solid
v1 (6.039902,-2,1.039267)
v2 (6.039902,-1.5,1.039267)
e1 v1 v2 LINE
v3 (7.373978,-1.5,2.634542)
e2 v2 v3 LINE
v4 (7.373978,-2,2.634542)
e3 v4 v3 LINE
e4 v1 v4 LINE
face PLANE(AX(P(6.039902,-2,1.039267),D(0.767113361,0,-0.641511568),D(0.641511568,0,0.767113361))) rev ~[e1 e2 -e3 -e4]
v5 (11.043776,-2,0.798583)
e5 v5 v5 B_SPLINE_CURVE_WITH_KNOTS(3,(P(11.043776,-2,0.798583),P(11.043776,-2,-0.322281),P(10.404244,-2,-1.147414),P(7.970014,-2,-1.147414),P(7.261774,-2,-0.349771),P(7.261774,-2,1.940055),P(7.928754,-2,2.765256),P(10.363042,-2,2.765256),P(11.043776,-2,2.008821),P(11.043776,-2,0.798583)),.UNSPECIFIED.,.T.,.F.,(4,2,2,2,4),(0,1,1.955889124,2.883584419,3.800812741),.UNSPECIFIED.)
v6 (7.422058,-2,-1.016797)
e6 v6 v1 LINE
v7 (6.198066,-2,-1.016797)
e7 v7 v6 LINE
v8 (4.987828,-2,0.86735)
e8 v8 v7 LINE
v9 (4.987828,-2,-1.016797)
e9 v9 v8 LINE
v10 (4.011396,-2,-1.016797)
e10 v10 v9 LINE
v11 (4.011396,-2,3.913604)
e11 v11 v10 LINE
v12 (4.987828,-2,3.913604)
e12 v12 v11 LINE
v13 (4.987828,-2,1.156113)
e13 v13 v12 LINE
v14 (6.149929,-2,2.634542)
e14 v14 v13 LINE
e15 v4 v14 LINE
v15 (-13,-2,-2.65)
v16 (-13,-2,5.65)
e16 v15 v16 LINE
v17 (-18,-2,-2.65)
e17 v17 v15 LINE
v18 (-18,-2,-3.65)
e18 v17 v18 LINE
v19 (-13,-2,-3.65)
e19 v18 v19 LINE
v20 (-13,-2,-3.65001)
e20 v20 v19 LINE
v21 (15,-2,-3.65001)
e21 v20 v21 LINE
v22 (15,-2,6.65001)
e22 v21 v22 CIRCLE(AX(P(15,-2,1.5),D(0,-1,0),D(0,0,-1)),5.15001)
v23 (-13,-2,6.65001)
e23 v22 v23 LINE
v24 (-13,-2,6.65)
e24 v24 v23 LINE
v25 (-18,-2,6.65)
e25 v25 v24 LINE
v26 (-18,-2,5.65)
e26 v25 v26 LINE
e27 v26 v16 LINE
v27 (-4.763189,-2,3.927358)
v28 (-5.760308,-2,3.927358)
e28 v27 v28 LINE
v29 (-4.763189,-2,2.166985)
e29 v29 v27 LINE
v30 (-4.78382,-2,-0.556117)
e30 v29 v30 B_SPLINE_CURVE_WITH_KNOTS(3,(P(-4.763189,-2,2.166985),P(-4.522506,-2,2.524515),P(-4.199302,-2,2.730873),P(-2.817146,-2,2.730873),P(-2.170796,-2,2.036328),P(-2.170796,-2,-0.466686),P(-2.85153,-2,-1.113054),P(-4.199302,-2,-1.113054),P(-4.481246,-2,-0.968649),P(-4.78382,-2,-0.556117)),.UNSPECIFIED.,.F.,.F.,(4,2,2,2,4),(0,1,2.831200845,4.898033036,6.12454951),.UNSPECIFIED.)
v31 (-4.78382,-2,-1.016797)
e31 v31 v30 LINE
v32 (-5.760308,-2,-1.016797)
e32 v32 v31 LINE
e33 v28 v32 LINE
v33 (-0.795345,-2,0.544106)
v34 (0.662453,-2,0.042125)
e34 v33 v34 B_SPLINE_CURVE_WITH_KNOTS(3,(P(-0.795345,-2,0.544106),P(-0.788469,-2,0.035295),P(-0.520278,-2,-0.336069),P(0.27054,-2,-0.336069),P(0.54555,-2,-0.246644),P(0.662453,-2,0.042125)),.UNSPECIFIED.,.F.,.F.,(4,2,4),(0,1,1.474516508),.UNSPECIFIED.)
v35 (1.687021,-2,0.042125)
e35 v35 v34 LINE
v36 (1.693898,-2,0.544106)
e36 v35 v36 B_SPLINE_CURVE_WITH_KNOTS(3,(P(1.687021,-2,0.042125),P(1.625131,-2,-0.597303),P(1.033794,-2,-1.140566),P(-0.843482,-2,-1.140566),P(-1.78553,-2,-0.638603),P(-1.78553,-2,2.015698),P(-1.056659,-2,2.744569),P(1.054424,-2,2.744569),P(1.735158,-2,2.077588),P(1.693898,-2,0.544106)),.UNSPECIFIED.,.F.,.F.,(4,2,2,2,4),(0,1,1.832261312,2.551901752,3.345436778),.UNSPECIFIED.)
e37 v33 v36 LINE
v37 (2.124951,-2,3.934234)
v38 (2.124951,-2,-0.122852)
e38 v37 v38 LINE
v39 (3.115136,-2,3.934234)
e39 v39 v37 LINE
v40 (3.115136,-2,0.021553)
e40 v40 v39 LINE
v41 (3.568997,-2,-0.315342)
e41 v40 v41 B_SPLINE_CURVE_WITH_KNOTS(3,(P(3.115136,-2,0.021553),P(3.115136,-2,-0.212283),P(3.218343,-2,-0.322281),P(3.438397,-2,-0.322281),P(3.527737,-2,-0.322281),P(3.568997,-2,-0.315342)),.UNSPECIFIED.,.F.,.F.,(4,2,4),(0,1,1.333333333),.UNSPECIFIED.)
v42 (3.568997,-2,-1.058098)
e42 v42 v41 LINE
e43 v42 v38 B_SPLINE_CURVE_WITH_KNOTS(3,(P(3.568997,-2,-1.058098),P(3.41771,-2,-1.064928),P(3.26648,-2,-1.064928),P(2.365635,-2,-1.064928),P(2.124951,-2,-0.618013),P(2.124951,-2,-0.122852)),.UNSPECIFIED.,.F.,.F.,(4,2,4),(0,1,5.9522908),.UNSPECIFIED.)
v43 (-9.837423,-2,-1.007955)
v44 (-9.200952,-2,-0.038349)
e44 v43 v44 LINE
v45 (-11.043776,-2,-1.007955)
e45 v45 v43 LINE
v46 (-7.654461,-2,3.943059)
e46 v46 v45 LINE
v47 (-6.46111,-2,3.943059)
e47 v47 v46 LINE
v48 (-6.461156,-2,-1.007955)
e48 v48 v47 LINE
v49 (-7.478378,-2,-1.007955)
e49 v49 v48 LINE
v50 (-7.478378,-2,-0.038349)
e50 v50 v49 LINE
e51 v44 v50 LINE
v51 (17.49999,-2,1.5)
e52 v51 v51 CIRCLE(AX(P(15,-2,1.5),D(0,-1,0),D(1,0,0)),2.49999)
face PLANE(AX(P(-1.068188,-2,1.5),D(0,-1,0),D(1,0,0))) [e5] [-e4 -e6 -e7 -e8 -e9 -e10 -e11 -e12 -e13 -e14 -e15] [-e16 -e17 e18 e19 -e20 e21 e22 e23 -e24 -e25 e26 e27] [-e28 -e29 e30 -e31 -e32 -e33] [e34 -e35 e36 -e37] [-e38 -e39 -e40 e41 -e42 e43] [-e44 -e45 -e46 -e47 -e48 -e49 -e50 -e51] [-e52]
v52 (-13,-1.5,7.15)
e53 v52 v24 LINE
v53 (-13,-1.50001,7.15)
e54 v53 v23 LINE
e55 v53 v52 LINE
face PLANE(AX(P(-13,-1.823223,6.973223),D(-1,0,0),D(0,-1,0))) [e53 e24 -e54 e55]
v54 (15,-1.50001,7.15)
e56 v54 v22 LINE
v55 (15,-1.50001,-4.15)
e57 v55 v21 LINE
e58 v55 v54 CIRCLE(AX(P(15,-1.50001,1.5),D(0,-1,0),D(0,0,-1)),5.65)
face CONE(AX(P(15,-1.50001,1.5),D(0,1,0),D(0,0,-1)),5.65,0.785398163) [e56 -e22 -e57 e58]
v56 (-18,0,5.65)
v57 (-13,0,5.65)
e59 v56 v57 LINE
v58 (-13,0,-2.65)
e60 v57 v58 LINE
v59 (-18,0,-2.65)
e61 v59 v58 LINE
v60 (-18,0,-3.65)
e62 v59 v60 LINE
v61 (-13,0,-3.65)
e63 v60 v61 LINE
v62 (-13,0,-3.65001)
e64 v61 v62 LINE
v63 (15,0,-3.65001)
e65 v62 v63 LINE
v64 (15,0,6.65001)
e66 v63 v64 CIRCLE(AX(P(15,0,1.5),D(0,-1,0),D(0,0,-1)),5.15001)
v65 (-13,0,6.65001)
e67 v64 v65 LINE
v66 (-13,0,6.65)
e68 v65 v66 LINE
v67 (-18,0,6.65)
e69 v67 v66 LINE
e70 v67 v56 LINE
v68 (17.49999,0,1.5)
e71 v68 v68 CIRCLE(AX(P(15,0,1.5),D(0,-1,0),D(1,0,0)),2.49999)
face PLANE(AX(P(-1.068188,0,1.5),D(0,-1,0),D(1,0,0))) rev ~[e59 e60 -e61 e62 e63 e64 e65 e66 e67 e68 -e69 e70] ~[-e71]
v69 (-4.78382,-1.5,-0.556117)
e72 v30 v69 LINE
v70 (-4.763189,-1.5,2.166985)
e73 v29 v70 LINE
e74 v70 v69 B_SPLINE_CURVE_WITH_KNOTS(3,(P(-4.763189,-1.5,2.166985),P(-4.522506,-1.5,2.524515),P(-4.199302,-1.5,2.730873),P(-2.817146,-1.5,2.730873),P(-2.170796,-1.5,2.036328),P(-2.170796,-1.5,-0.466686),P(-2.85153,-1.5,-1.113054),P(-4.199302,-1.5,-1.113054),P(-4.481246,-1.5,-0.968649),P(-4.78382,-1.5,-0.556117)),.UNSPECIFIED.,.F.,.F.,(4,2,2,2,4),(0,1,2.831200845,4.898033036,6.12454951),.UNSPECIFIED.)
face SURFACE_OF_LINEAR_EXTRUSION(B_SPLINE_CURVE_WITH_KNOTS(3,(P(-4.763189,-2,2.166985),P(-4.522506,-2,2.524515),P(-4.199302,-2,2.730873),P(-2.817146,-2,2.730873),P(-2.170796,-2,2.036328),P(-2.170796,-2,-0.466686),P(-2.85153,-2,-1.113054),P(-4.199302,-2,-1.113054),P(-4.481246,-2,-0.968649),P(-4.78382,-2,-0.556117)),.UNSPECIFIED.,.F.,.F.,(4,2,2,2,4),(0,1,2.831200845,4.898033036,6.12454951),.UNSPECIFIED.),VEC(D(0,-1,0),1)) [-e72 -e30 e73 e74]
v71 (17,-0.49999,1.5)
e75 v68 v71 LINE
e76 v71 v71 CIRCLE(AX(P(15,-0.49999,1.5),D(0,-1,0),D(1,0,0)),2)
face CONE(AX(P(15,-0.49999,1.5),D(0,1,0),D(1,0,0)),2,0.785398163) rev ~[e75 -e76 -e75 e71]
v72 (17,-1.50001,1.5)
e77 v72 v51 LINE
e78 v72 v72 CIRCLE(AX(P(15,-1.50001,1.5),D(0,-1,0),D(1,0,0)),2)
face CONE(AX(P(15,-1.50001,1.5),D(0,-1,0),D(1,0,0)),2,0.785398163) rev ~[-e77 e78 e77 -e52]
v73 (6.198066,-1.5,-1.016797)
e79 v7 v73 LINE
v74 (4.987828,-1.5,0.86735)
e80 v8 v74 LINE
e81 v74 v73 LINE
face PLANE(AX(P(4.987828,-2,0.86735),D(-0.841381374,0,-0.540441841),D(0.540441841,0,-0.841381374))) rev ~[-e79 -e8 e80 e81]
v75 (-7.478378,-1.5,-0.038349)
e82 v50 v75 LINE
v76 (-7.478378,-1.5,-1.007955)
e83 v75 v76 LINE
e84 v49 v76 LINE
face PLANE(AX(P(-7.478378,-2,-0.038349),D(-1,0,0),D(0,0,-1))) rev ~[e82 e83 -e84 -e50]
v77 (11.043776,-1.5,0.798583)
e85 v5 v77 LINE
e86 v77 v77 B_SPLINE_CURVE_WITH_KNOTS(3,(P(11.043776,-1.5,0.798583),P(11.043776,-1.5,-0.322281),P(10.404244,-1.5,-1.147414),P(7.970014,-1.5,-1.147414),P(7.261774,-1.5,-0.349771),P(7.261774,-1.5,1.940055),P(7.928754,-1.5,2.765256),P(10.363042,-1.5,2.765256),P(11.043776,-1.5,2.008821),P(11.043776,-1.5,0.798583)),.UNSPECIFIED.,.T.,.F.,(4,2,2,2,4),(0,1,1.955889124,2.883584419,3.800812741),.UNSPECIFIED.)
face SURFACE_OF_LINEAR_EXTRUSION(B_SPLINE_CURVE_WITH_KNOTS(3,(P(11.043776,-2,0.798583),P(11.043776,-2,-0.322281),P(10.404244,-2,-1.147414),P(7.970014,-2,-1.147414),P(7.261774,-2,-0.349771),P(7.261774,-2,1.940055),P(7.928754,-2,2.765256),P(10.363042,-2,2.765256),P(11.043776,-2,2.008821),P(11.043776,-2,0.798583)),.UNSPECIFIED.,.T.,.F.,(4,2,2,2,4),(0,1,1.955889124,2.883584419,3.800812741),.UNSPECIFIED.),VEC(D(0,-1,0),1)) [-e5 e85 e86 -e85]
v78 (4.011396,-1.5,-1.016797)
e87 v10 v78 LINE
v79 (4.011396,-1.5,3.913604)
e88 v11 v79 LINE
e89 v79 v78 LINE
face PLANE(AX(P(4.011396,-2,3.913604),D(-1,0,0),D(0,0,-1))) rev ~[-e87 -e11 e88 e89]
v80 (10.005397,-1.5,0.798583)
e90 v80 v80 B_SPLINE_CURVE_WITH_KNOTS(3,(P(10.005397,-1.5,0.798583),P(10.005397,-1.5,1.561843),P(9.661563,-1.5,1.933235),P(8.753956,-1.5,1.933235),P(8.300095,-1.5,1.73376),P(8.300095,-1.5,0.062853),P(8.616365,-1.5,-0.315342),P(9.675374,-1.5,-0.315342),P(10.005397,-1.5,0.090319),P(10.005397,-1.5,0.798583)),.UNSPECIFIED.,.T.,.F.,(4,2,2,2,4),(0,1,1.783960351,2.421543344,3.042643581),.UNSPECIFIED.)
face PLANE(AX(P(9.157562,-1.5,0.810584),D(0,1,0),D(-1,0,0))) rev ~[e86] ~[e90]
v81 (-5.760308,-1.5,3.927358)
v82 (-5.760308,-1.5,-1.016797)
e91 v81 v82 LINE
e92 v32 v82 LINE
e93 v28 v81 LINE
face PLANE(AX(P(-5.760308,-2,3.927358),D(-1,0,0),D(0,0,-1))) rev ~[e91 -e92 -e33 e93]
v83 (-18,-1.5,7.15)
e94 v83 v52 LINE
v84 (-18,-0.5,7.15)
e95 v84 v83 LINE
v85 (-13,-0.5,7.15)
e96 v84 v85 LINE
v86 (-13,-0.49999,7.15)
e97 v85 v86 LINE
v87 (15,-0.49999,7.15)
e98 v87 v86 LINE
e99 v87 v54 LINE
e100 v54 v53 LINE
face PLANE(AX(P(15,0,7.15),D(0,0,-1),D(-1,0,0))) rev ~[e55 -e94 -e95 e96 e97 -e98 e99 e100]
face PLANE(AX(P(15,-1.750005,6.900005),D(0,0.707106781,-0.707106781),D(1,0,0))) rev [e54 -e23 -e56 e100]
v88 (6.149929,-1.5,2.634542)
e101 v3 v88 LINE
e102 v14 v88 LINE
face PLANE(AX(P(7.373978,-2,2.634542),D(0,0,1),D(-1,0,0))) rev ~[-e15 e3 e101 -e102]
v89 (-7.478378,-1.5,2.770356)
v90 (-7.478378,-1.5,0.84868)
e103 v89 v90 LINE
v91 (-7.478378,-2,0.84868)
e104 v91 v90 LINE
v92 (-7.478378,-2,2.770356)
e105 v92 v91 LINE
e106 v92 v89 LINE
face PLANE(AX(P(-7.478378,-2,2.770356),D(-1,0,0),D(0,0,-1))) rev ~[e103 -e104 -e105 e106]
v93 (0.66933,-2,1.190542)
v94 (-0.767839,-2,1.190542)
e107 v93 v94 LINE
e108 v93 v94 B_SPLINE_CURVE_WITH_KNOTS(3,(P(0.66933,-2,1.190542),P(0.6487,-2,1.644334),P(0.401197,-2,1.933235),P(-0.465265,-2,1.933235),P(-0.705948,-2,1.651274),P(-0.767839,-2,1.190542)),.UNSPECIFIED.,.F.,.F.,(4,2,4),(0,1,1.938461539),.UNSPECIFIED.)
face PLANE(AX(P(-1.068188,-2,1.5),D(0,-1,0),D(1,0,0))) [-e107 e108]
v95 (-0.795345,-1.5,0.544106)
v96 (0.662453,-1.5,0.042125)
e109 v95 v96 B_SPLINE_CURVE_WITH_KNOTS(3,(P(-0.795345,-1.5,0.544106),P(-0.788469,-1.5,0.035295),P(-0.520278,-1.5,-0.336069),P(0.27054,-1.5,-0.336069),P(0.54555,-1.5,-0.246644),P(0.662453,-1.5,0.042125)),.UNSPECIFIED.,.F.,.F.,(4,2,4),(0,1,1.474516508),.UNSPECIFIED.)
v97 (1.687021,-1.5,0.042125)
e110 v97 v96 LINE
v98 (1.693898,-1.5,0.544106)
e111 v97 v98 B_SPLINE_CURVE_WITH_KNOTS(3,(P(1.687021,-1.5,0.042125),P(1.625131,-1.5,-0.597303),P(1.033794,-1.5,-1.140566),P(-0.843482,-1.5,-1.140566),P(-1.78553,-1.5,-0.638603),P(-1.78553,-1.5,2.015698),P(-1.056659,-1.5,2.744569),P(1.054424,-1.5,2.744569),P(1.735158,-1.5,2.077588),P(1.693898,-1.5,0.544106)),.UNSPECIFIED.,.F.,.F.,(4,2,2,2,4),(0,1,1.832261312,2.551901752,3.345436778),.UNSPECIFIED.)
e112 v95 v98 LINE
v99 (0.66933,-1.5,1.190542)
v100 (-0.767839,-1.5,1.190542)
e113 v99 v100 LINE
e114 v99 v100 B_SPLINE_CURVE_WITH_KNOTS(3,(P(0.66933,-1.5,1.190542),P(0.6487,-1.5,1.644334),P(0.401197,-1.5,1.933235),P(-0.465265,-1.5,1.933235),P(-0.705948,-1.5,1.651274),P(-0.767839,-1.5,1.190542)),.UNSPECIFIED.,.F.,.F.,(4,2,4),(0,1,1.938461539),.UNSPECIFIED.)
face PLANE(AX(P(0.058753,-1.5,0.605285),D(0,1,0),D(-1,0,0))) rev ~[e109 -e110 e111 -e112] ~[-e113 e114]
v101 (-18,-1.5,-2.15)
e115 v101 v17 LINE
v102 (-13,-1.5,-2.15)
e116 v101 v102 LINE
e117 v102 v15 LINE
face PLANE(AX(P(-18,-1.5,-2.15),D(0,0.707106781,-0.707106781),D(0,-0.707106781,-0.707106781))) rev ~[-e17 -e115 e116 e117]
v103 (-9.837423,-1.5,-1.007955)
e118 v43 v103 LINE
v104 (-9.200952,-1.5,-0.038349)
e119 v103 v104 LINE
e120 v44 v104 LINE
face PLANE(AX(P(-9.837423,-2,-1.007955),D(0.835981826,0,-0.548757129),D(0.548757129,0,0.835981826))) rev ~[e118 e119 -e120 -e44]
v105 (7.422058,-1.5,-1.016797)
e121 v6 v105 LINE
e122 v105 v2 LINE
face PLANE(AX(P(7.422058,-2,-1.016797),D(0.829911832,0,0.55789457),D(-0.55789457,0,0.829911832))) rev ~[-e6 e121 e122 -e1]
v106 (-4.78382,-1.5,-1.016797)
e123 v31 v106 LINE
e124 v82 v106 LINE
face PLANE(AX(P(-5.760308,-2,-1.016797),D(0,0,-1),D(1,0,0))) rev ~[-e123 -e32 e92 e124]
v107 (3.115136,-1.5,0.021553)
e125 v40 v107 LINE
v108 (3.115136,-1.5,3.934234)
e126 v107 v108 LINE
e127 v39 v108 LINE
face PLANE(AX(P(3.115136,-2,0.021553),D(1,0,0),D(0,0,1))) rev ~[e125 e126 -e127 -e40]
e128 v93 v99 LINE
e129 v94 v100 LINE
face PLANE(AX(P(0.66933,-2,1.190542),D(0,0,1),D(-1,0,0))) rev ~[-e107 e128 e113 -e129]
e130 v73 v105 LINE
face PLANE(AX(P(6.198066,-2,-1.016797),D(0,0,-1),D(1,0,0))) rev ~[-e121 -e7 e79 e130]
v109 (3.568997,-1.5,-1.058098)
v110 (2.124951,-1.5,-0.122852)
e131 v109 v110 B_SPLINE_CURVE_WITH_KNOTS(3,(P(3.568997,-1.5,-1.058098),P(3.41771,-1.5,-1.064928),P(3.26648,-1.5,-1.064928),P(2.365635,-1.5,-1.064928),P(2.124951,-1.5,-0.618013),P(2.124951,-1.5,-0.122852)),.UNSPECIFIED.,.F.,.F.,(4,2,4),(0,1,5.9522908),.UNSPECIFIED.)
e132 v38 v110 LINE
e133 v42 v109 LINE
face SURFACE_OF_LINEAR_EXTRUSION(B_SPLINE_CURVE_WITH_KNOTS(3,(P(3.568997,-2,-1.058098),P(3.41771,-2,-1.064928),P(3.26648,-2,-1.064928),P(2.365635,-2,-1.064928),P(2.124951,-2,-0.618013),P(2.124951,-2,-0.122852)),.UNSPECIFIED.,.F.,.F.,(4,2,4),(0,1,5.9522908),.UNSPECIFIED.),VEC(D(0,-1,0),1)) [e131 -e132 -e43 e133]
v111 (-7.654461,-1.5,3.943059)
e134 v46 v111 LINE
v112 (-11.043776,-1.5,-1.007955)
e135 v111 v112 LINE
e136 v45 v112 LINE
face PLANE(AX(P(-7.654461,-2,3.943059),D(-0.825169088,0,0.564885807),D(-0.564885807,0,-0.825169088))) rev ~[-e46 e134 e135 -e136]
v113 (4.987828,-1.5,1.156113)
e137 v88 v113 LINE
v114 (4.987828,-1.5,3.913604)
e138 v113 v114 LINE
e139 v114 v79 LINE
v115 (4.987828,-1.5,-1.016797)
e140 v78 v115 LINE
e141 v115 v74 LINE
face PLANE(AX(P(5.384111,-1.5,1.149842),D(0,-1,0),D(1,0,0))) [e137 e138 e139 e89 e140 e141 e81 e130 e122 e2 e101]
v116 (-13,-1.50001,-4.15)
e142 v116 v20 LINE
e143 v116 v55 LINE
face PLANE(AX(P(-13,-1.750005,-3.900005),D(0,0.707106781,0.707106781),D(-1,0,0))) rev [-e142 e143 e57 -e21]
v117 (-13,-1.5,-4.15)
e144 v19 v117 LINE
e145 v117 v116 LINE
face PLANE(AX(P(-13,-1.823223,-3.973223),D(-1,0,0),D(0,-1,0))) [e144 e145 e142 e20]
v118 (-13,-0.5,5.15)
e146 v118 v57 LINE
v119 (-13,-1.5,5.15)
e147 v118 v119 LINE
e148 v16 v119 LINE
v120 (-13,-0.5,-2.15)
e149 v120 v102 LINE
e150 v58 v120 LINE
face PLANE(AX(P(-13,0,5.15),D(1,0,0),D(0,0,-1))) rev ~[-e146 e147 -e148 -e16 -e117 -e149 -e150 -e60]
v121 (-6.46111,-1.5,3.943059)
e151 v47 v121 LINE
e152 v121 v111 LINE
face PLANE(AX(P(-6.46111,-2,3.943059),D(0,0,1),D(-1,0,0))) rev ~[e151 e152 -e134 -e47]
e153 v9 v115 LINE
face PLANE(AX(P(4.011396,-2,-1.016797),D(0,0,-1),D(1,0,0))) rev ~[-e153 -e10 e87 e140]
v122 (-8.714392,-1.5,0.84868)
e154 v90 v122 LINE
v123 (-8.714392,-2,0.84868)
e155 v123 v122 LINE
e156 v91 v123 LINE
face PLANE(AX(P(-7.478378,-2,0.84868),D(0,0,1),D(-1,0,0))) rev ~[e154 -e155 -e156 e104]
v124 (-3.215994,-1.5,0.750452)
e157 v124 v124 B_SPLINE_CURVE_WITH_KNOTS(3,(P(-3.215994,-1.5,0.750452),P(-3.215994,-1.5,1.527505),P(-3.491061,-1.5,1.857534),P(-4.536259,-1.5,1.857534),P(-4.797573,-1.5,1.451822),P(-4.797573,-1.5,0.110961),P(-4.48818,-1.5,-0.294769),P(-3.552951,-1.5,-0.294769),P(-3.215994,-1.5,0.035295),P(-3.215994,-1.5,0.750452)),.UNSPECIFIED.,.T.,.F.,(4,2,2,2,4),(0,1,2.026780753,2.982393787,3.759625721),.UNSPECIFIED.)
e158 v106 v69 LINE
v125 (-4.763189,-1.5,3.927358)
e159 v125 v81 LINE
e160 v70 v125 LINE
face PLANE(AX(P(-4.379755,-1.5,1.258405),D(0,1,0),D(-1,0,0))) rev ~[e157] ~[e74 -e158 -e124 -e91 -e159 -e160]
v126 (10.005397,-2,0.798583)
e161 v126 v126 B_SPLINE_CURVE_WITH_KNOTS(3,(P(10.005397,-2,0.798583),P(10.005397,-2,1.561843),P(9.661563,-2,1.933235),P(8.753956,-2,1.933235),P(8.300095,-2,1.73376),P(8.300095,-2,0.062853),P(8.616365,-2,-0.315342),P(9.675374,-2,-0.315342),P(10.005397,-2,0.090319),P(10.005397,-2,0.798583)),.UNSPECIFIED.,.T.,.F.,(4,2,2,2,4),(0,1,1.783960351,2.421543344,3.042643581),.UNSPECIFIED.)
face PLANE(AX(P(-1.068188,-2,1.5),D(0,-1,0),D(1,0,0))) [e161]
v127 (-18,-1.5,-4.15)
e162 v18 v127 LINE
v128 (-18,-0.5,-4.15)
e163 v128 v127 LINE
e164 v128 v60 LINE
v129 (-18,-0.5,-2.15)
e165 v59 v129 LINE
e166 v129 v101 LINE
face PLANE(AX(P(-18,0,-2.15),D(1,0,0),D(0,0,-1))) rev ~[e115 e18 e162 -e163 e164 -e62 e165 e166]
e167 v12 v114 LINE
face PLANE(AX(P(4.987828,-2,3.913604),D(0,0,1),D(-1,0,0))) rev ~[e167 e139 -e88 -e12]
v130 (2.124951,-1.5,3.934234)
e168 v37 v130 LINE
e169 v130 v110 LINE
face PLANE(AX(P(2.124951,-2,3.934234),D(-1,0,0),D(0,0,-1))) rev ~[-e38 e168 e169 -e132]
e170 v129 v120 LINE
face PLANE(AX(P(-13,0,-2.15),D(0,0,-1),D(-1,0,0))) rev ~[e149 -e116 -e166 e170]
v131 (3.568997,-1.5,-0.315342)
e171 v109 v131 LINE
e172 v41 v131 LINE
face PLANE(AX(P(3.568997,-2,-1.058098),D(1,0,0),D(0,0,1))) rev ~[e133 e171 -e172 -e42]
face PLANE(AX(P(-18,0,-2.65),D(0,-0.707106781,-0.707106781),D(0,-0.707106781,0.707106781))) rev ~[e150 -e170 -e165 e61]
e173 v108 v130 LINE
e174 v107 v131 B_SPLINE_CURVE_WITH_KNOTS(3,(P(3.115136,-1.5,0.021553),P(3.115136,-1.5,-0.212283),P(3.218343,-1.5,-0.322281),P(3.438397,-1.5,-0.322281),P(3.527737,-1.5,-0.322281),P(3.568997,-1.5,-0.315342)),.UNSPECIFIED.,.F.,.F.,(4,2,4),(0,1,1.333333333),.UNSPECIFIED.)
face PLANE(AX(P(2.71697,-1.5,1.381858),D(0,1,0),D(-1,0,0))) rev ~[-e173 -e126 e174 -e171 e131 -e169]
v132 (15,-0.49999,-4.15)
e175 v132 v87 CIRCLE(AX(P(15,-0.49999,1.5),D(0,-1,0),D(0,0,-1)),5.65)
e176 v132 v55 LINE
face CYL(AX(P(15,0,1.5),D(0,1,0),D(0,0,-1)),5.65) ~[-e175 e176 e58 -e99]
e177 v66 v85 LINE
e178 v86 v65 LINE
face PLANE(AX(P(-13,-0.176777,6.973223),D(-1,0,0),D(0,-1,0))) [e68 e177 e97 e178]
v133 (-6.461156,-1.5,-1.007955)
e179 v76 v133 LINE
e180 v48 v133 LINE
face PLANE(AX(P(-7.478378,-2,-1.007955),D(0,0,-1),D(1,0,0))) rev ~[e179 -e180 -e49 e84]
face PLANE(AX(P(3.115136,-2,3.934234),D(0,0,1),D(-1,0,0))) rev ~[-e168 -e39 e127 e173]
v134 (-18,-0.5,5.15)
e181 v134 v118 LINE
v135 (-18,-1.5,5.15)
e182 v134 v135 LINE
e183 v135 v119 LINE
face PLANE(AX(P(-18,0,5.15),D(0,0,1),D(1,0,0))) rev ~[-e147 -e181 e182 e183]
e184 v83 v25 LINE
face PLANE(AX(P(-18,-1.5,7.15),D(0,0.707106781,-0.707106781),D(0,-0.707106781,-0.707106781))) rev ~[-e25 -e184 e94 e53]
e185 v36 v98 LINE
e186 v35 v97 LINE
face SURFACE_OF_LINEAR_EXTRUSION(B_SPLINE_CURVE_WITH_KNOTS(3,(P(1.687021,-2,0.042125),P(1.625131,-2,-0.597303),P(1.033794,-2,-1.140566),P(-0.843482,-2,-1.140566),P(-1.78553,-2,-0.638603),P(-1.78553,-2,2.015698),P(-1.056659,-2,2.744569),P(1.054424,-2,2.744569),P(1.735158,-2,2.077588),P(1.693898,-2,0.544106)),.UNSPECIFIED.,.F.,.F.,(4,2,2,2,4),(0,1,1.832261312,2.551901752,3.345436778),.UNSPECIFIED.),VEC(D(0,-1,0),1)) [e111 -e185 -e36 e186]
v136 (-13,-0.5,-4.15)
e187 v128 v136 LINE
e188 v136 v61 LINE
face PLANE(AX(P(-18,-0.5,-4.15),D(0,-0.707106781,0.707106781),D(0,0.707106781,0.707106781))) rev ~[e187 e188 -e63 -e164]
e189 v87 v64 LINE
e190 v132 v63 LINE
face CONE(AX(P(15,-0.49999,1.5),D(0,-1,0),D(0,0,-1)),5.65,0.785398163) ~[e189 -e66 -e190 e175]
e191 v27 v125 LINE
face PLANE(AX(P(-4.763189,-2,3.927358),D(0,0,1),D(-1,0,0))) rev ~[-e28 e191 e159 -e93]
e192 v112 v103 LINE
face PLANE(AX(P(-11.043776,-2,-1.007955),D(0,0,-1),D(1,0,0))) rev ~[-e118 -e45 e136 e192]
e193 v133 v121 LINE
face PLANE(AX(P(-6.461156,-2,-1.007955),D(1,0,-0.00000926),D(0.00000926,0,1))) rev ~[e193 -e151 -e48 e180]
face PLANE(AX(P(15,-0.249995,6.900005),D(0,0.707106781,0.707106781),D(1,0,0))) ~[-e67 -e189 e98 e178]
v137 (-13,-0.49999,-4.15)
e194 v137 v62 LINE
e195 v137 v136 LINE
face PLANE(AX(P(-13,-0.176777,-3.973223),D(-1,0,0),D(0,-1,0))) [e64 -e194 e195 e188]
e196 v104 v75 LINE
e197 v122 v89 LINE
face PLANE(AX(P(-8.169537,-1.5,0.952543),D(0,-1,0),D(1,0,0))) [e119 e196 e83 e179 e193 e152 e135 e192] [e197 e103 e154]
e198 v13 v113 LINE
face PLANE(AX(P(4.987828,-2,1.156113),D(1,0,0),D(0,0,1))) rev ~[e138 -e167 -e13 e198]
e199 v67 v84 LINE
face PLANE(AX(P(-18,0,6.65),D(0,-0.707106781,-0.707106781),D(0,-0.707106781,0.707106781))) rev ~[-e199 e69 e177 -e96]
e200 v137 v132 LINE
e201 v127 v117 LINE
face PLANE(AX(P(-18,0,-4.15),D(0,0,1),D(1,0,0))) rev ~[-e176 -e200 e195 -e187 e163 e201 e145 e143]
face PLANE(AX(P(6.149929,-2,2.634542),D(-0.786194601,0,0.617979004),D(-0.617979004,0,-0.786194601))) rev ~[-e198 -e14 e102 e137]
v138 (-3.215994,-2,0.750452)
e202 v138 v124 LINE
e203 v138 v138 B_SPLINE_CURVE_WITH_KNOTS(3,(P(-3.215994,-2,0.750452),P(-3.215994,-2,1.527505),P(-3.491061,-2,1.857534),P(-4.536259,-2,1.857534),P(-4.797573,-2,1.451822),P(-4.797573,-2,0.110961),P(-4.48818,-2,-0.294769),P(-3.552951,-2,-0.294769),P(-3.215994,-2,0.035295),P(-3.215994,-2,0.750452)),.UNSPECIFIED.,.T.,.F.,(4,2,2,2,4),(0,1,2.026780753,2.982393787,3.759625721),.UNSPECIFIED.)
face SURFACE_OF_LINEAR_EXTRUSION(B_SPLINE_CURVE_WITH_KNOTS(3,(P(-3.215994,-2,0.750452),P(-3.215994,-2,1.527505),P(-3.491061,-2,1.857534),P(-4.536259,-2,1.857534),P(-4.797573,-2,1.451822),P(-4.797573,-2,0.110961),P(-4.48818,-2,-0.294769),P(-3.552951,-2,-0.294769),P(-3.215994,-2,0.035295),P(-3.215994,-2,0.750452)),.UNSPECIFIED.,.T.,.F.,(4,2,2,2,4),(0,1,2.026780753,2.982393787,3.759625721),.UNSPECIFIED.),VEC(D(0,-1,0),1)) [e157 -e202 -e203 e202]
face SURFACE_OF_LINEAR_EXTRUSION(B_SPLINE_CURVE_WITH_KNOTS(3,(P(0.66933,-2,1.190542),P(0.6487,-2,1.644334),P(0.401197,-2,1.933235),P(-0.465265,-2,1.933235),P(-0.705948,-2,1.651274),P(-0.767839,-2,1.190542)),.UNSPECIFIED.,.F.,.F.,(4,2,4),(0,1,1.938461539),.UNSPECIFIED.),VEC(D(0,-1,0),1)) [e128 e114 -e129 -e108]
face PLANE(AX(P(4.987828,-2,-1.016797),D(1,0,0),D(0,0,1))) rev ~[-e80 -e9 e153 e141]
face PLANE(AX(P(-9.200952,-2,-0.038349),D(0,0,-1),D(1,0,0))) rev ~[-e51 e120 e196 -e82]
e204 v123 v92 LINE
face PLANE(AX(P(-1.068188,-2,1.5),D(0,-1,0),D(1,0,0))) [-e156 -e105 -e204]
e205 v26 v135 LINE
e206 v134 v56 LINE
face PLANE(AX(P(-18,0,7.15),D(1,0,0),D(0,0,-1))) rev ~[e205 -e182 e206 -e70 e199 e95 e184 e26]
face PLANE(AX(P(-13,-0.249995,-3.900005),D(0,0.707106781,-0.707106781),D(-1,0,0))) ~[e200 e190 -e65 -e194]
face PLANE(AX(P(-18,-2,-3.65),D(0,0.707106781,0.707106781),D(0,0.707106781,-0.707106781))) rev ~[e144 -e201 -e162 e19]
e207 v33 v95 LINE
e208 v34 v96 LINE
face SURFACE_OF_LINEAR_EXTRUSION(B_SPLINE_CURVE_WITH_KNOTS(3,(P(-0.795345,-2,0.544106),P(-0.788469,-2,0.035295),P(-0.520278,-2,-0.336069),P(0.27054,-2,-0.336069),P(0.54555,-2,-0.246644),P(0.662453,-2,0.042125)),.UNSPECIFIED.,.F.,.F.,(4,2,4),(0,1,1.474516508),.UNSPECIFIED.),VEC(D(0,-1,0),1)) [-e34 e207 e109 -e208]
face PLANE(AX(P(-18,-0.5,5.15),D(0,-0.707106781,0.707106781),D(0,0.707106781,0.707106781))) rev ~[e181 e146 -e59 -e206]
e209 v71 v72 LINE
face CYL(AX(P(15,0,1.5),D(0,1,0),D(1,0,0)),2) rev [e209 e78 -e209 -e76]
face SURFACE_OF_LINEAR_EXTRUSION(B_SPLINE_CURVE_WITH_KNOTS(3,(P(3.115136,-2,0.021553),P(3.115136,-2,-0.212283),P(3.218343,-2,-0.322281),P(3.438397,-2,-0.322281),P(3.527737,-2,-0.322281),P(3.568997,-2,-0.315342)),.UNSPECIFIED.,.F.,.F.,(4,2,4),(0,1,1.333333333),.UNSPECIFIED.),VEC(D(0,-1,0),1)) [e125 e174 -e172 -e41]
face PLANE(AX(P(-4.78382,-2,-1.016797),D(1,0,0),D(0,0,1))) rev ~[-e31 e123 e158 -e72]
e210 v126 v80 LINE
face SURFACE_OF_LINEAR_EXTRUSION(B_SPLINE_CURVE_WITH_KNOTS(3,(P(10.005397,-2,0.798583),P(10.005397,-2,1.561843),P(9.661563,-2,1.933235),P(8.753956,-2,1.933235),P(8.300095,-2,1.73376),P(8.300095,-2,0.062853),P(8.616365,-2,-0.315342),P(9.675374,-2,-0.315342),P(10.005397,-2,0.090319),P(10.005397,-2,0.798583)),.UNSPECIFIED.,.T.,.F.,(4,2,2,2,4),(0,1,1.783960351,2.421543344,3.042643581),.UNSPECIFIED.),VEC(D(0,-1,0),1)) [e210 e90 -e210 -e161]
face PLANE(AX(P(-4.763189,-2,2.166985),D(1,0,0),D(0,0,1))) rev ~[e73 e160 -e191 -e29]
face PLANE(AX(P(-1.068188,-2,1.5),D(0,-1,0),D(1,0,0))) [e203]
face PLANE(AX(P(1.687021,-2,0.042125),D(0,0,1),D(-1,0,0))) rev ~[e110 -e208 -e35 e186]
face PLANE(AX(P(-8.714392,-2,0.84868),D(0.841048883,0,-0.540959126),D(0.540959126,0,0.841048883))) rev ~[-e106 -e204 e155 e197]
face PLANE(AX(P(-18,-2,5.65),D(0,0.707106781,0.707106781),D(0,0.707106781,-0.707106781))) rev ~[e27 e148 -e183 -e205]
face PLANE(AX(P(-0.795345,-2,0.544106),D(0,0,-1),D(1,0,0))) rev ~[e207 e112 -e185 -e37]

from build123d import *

# Parameters (mm, degrees)
F0_R     = 2
F1_DEPTH = 2
F3_DEPTH = 0.5
F6_DEPTH = 5
F7_SIZE  = 0.49999


# Not quite as in the source:
# - a fillet or chamfer is up to 0.001 mm smaller than in the source, because OpenCascade refuses the exact size
# - a feature names something its author has since deleted; it is built from what else it names


with BuildPart() as f1:
    # F0 (on Front) → F1 (new body)
    with BuildSketch(Plane.XZ):
        with BuildLine():
            Line((-18, 5.15), (-13, 5.15))
            Line((-13, 5.15), (-13, -2.15))
            Line((-13, -2.15), (-18, -2.15))
            Line((-18, -2.15), (-18, -4.15))
            Line((-18, -4.15), (15, -4.15))
            ThreePointArc((15, -4.15), (20.65, 1.5), (15, 7.15))
            Line((15, 7.15), (-18, 7.15))
            Line((-18, 7.15), (-18, 5.15))
        make_face()
        with Locations((15, 1.5)):
            Circle(F0_R, mode=Mode.SUBTRACT)
    extrude(amount=F1_DEPTH)

    # F2 (on face) → F3 (cut)
    with BuildSketch(Plane.XZ.offset(2)):
        Polygon((-6.4611563108, -1.0079550547), (-6.4611104663, 3.943059476), (-7.6544608052, 3.943059476), (-11.0437756499, -1.0079550547), (-9.8374226558, -1.0079550547), (-9.200951568, -0.0383489504), (-7.4783776914, -0.0383489504), (-7.4783776914, -1.0079550547), align=None)
        Polygon((-7.4783776914, 0.8486796922), (-8.7143920972, 0.8486796922), (-7.4783776914, 2.7703563678), align=None, mode=Mode.SUBTRACT)
        with BuildLine():
            add(Edge.make_bspline(
                [(-4.7631894864, 2.1669850315), (-4.5225056976, 2.5245150692), (-4.1993017526, 2.7308727653), (-3.7111148009, 2.7308727653)],
                knots=[0, 0, 0, 0, 1, 1, 1, 1], degree=3))
            Line((-4.7631894864, 2.1669850315), (-4.7631894864, 3.927357724))
            Line((-4.7631894864, 3.927357724), (-5.7603080401, 3.927357724))
            Line((-5.7603080401, 3.927357724), (-5.7603080401, -1.0167973187))
            Line((-5.7603080401, -1.0167973187), (-4.7838195254, -1.0167973187))
            Line((-4.7838195254, -1.0167973187), (-4.7838195254, -0.5561170858))
            add(Edge.make_bspline(
                [(-3.6973614416, -1.1130536425), (-4.1993017526, -1.1130536425), (-4.4812456195, -0.9686490998), (-4.7838195254, -0.5561170858)],
                knots=[0, 0, 0, 0, 1, 1, 1, 1], degree=3))
            add(Edge.make_bspline(
                [(-2.1707958582, 0.8604731979), (-2.1707958582, -0.4666858665), (-2.8515298409, -1.1130536425), (-3.6973614416, -1.1130536425)],
                knots=[0, 0, 0, 0, 1, 1, 1, 1], degree=3))
            add(Edge.make_bspline(
                [(-3.7111148009, 2.7308727653), (-2.8171464425, 2.7308727653), (-2.1707958582, 2.0363281176), (-2.1707958582, 0.8604731979)],
                knots=[0, 0, 0, 0, 1, 1, 1, 1], degree=3))
        make_face()
        with BuildLine():
            add(Edge.make_bspline(
                [(-3.9724286288, -0.2947688745), (-3.5529511683, -0.2947688745), (-3.2159938639, 0.0352945585), (-3.2159938639, 0.7504520535)],
                knots=[0, 0, 0, 0, 1, 1, 1, 1], degree=3))
            add(Edge.make_bspline(
                [(-4.7975728848, 0.7573230027), (-4.7975728848, 0.1109609572), (-4.4881796048, -0.2947688745), (-3.9724286288, -0.2947688745)],
                knots=[0, 0, 0, 0, 1, 1, 1, 1], degree=3))
            add(Edge.make_bspline(
                [(-4.0067547215, 1.8575344459), (-4.5362590569, 1.8575344459), (-4.7975728848, 1.4518218059), (-4.7975728848, 0.7573230027)],
                knots=[0, 0, 0, 0, 1, 1, 1, 1], degree=3))
            add(Edge.make_bspline(
                [(-3.2159938639, 0.7504520535), (-3.2159938639, 1.5275053963), (-3.4910610511, 1.8575344459), (-4.0067547215, 1.8575344459)],
                knots=[0, 0, 0, 0, 1, 1, 1, 1], degree=3))
        make_face(mode=Mode.SUBTRACT)
        with BuildLine():
            add(Edge.make_bspline(
                [(-0.0526639052, 2.744568819), (1.0544242177, 2.744568819), (1.7351582004, 2.0775881956), (1.6938981223, 0.5441058186)],
                knots=[0, 0, 0, 0, 1, 1, 1, 1], degree=3))
            add(Edge.make_bspline(
                [(-1.785529879, 0.7848583742), (-1.785529879, 2.0156980785), (-1.0566591386, 2.744568819), (-0.0526639052, 2.744568819)],
                knots=[0, 0, 0, 0, 1, 1, 1, 1], degree=3))
            add(Edge.make_bspline(
                [(0.0092262119, -1.1405660918), (-0.8434820685, -1.1405660918), (-1.785529879, -0.6386028585), (-1.785529879, 0.7848583742)],
                knots=[0, 0, 0, 0, 1, 1, 1, 1], degree=3))
            add(Edge.make_bspline(
                [(1.6870214426, 0.0421253936), (1.6251313255, -0.5973026665), (1.0337941786, -1.1405660918), (0.0092262119, -1.1405660918)],
                knots=[0, 0, 0, 0, 1, 1, 1, 1], degree=3))
            Line((1.6870214426, 0.0421253936), (0.6624534759, 0.0421253936))
            add(Edge.make_bspline(
                [(0.0160455859, -0.3360690666), (0.2705400398, -0.3360690666), (0.5455499213, -0.2466435779), (0.6624534759, 0.0421253936)],
                knots=[0, 0, 0, 0, 1, 1, 1, 1], degree=3))
            add(Edge.make_bspline(
                [(-0.7953453107, 0.5441058186), (-0.788468631, 0.0352945585), (-0.5202781235, -0.3360690666), (0.0160455859, -0.3360690666)],
                knots=[0, 0, 0, 0, 1, 1, 1, 1], degree=3))
            Line((-0.7953453107, 0.5441058186), (1.6938981223, 0.5441058186))
        make_face()
        with BuildLine():
            add(Edge.make_bspline(
                [(0.6693301556, 1.1905423614), (0.6487001165, 1.6443344535), (0.4011969537, 1.933235228), (-0.0457872255, 1.933235228)],
                knots=[0, 0, 0, 0, 1, 1, 1, 1], degree=3))
            Line((0.6693301556, 1.1905423614), (-0.767838592, 1.1905423614))
            add(Edge.make_bspline(
                [(-0.0457872255, 1.933235228), (-0.4652646861, 1.933235228), (-0.7059484749, 1.6512741694), (-0.767838592, 1.1905423614)],
                knots=[0, 0, 0, 0, 1, 1, 1, 1], degree=3))
        make_face(mode=Mode.SUBTRACT)
        with BuildLine():
            add(Edge.make_bspline(
                [(3.3833837085, -0.3222813238), (3.4383971459, -0.3222813238), (3.5277366761, -0.3222813238), (3.5689967542, -0.3153416079)],
                knots=[0, 0, 0, 0, 1, 1, 1, 1], degree=3))
            add(Edge.make_bspline(
                [(3.1151358953, 0.0215526602), (3.1151358953, -0.2122831017), (3.2183433962, -0.3222813238), (3.3833837085, -0.3222813238)],
                knots=[0, 0, 0, 0, 1, 1, 1, 1], degree=3))
            Line((3.1151358953, 0.0215526602), (3.1151358953, 3.9342344037))
            Line((3.1151358953, 3.9342344037), (2.1249513269, 3.9342344037))
            Line((2.1249513269, 3.9342344037), (2.1249513269, -0.1228518825))
            add(Edge.make_bspline(
                [(3.1151358953, -1.0649283459), (2.3656351158, -1.0649283459), (2.1249513269, -0.6180129335), (2.1249513269, -0.1228518825)],
                knots=[0, 0, 0, 0, 1, 1, 1, 1], degree=3))
            add(Edge.make_bspline(
                [(3.5689967542, -1.0580975107), (3.4177098012, -1.0649283459), (3.2664801539, -1.0649283459), (3.1151358953, -1.0649283459)],
                knots=[0, 0, 0, 0, 1, 1, 1, 1], degree=3))
            Line((3.5689967542, -1.0580975107), (3.5689967542, -0.3153416079))
        make_face()
        Polygon((4.9878276893, 1.1561131185), (4.9878276893, 3.9136043647), (4.0113964803, 3.9136043647), (4.0113964803, -1.0167973187), (4.9878276893, -1.0167973187), (4.9878276893, 0.8673498775), (6.1980660074, -1.0167973187), (7.4220576849, -1.0167973187), (6.0399023747, 1.0392668696), (7.3739782328, 2.6345419441), (6.1499292496, 2.6345419441), align=None)
        with BuildLine():
            add(Edge.make_bspline(
                [(9.1528033491, 2.7652561637), (10.3630416672, 2.7652561637), (11.0437756499, 2.0088213988), (11.0437756499, 0.7985830807)],
                knots=[0, 0, 0, 0, 1, 1, 1, 1], degree=3))
            add(Edge.make_bspline(
                [(7.2617737426, 0.8122791344), (7.2617737426, 1.940054602), (7.928754366, 2.7652561637), (9.1528033491, 2.7652561637)],
                knots=[0, 0, 0, 0, 1, 1, 1, 1], degree=3))
            add(Edge.make_bspline(
                [(9.1596800288, -1.1474141187), (7.9700144441, -1.1474141187), (7.2617737426, -0.3497708508), (7.2617737426, 0.8122791344)],
                knots=[0, 0, 0, 0, 1, 1, 1, 1], degree=3))
            add(Edge.make_bspline(
                [(11.0437756499, 0.7985830807), (11.0437756499, -0.3222813238), (10.4042444396, -1.1474141187), (9.1596800288, -1.1474141187)],
                knots=[0, 0, 0, 0, 1, 1, 1, 1], degree=3))
        make_face()
        with BuildLine():
            add(Edge.make_bspline(
                [(9.1528033491, -0.3153416079), (9.6753736992, -0.3153416079), (10.0053970182, 0.090319457), (10.0053970182, 0.7985830807)],
                knots=[0, 0, 0, 0, 1, 1, 1, 1], degree=3))
            add(Edge.make_bspline(
                [(8.3000950687, 0.8122791344), (8.3000950687, 0.0628528523), (8.6163650284, -0.3153416079), (9.1528033491, -0.3153416079)],
                knots=[0, 0, 0, 0, 1, 1, 1, 1], degree=3))
            add(Edge.make_bspline(
                [(9.1528033491, 1.933235228), (8.7539559276, 1.933235228), (8.3000950687, 1.7337599422), (8.3000950687, 0.8122791344)],
                knots=[0, 0, 0, 0, 1, 1, 1, 1], degree=3))
            add(Edge.make_bspline(
                [(10.0053970182, 0.7985830807), (10.0053970182, 1.5618429502), (9.6615630342, 1.933235228), (9.1528033491, 1.933235228)],
                knots=[0, 0, 0, 0, 1, 1, 1, 1], degree=3))
        make_face(mode=Mode.SUBTRACT)
    extrude(amount=-F3_DEPTH, mode=Mode.SUBTRACT)

    # F4 (on face) + F5 (on face) → F6 (cut)
    with BuildSketch(Plane(origin=(-18, 0, 0), x_dir=(0, -1, 0), z_dir=(-1, 0, 0))):
        Polygon((0.5, 5.15), (0, 5.65), (0, 5.15), align=None)
        Polygon((0, 7.15), (0, 6.65), (0.5, 7.15), align=None)
        Polygon((2, 7.15), (1.5, 7.15), (2, 6.65), align=None)
        Polygon((2, 5.65), (1.5, 5.15), (2, 5.15), align=None)
    with BuildSketch(Plane(origin=(-18, 0, 0), x_dir=(0, -1, 0), z_dir=(-1, 0, 0))):
        Polygon((0, -2.15), (0, -2.65), (0.5, -2.15), align=None)
        Polygon((2, -2.15), (1.5, -2.15), (2, -2.65), align=None)
        Polygon((2, -3.65), (1.5, -4.15), (2, -4.15), align=None)
        Polygon((0.5, -4.15), (0, -3.65), (0, -4.15), align=None)
    extrude(amount=-F6_DEPTH, mode=Mode.SUBTRACT)

    # F7 (size 0.5 in the source; OpenCascade refuses exactly that, so slightly less here)
    f7_edges = [f1.edges().sort_by_distance(p)[0] for p in [
        (1, -2, -4.15),
        (20.65, -2, 1.5),
        (1, -2, 7.15),
        (1, 0, -4.15),
        (13, -2, 1.5),
        (13, 0, 1.5),
    ]]
    chamfer(f7_edges, length=F7_SIZE)


solid = f1.part
